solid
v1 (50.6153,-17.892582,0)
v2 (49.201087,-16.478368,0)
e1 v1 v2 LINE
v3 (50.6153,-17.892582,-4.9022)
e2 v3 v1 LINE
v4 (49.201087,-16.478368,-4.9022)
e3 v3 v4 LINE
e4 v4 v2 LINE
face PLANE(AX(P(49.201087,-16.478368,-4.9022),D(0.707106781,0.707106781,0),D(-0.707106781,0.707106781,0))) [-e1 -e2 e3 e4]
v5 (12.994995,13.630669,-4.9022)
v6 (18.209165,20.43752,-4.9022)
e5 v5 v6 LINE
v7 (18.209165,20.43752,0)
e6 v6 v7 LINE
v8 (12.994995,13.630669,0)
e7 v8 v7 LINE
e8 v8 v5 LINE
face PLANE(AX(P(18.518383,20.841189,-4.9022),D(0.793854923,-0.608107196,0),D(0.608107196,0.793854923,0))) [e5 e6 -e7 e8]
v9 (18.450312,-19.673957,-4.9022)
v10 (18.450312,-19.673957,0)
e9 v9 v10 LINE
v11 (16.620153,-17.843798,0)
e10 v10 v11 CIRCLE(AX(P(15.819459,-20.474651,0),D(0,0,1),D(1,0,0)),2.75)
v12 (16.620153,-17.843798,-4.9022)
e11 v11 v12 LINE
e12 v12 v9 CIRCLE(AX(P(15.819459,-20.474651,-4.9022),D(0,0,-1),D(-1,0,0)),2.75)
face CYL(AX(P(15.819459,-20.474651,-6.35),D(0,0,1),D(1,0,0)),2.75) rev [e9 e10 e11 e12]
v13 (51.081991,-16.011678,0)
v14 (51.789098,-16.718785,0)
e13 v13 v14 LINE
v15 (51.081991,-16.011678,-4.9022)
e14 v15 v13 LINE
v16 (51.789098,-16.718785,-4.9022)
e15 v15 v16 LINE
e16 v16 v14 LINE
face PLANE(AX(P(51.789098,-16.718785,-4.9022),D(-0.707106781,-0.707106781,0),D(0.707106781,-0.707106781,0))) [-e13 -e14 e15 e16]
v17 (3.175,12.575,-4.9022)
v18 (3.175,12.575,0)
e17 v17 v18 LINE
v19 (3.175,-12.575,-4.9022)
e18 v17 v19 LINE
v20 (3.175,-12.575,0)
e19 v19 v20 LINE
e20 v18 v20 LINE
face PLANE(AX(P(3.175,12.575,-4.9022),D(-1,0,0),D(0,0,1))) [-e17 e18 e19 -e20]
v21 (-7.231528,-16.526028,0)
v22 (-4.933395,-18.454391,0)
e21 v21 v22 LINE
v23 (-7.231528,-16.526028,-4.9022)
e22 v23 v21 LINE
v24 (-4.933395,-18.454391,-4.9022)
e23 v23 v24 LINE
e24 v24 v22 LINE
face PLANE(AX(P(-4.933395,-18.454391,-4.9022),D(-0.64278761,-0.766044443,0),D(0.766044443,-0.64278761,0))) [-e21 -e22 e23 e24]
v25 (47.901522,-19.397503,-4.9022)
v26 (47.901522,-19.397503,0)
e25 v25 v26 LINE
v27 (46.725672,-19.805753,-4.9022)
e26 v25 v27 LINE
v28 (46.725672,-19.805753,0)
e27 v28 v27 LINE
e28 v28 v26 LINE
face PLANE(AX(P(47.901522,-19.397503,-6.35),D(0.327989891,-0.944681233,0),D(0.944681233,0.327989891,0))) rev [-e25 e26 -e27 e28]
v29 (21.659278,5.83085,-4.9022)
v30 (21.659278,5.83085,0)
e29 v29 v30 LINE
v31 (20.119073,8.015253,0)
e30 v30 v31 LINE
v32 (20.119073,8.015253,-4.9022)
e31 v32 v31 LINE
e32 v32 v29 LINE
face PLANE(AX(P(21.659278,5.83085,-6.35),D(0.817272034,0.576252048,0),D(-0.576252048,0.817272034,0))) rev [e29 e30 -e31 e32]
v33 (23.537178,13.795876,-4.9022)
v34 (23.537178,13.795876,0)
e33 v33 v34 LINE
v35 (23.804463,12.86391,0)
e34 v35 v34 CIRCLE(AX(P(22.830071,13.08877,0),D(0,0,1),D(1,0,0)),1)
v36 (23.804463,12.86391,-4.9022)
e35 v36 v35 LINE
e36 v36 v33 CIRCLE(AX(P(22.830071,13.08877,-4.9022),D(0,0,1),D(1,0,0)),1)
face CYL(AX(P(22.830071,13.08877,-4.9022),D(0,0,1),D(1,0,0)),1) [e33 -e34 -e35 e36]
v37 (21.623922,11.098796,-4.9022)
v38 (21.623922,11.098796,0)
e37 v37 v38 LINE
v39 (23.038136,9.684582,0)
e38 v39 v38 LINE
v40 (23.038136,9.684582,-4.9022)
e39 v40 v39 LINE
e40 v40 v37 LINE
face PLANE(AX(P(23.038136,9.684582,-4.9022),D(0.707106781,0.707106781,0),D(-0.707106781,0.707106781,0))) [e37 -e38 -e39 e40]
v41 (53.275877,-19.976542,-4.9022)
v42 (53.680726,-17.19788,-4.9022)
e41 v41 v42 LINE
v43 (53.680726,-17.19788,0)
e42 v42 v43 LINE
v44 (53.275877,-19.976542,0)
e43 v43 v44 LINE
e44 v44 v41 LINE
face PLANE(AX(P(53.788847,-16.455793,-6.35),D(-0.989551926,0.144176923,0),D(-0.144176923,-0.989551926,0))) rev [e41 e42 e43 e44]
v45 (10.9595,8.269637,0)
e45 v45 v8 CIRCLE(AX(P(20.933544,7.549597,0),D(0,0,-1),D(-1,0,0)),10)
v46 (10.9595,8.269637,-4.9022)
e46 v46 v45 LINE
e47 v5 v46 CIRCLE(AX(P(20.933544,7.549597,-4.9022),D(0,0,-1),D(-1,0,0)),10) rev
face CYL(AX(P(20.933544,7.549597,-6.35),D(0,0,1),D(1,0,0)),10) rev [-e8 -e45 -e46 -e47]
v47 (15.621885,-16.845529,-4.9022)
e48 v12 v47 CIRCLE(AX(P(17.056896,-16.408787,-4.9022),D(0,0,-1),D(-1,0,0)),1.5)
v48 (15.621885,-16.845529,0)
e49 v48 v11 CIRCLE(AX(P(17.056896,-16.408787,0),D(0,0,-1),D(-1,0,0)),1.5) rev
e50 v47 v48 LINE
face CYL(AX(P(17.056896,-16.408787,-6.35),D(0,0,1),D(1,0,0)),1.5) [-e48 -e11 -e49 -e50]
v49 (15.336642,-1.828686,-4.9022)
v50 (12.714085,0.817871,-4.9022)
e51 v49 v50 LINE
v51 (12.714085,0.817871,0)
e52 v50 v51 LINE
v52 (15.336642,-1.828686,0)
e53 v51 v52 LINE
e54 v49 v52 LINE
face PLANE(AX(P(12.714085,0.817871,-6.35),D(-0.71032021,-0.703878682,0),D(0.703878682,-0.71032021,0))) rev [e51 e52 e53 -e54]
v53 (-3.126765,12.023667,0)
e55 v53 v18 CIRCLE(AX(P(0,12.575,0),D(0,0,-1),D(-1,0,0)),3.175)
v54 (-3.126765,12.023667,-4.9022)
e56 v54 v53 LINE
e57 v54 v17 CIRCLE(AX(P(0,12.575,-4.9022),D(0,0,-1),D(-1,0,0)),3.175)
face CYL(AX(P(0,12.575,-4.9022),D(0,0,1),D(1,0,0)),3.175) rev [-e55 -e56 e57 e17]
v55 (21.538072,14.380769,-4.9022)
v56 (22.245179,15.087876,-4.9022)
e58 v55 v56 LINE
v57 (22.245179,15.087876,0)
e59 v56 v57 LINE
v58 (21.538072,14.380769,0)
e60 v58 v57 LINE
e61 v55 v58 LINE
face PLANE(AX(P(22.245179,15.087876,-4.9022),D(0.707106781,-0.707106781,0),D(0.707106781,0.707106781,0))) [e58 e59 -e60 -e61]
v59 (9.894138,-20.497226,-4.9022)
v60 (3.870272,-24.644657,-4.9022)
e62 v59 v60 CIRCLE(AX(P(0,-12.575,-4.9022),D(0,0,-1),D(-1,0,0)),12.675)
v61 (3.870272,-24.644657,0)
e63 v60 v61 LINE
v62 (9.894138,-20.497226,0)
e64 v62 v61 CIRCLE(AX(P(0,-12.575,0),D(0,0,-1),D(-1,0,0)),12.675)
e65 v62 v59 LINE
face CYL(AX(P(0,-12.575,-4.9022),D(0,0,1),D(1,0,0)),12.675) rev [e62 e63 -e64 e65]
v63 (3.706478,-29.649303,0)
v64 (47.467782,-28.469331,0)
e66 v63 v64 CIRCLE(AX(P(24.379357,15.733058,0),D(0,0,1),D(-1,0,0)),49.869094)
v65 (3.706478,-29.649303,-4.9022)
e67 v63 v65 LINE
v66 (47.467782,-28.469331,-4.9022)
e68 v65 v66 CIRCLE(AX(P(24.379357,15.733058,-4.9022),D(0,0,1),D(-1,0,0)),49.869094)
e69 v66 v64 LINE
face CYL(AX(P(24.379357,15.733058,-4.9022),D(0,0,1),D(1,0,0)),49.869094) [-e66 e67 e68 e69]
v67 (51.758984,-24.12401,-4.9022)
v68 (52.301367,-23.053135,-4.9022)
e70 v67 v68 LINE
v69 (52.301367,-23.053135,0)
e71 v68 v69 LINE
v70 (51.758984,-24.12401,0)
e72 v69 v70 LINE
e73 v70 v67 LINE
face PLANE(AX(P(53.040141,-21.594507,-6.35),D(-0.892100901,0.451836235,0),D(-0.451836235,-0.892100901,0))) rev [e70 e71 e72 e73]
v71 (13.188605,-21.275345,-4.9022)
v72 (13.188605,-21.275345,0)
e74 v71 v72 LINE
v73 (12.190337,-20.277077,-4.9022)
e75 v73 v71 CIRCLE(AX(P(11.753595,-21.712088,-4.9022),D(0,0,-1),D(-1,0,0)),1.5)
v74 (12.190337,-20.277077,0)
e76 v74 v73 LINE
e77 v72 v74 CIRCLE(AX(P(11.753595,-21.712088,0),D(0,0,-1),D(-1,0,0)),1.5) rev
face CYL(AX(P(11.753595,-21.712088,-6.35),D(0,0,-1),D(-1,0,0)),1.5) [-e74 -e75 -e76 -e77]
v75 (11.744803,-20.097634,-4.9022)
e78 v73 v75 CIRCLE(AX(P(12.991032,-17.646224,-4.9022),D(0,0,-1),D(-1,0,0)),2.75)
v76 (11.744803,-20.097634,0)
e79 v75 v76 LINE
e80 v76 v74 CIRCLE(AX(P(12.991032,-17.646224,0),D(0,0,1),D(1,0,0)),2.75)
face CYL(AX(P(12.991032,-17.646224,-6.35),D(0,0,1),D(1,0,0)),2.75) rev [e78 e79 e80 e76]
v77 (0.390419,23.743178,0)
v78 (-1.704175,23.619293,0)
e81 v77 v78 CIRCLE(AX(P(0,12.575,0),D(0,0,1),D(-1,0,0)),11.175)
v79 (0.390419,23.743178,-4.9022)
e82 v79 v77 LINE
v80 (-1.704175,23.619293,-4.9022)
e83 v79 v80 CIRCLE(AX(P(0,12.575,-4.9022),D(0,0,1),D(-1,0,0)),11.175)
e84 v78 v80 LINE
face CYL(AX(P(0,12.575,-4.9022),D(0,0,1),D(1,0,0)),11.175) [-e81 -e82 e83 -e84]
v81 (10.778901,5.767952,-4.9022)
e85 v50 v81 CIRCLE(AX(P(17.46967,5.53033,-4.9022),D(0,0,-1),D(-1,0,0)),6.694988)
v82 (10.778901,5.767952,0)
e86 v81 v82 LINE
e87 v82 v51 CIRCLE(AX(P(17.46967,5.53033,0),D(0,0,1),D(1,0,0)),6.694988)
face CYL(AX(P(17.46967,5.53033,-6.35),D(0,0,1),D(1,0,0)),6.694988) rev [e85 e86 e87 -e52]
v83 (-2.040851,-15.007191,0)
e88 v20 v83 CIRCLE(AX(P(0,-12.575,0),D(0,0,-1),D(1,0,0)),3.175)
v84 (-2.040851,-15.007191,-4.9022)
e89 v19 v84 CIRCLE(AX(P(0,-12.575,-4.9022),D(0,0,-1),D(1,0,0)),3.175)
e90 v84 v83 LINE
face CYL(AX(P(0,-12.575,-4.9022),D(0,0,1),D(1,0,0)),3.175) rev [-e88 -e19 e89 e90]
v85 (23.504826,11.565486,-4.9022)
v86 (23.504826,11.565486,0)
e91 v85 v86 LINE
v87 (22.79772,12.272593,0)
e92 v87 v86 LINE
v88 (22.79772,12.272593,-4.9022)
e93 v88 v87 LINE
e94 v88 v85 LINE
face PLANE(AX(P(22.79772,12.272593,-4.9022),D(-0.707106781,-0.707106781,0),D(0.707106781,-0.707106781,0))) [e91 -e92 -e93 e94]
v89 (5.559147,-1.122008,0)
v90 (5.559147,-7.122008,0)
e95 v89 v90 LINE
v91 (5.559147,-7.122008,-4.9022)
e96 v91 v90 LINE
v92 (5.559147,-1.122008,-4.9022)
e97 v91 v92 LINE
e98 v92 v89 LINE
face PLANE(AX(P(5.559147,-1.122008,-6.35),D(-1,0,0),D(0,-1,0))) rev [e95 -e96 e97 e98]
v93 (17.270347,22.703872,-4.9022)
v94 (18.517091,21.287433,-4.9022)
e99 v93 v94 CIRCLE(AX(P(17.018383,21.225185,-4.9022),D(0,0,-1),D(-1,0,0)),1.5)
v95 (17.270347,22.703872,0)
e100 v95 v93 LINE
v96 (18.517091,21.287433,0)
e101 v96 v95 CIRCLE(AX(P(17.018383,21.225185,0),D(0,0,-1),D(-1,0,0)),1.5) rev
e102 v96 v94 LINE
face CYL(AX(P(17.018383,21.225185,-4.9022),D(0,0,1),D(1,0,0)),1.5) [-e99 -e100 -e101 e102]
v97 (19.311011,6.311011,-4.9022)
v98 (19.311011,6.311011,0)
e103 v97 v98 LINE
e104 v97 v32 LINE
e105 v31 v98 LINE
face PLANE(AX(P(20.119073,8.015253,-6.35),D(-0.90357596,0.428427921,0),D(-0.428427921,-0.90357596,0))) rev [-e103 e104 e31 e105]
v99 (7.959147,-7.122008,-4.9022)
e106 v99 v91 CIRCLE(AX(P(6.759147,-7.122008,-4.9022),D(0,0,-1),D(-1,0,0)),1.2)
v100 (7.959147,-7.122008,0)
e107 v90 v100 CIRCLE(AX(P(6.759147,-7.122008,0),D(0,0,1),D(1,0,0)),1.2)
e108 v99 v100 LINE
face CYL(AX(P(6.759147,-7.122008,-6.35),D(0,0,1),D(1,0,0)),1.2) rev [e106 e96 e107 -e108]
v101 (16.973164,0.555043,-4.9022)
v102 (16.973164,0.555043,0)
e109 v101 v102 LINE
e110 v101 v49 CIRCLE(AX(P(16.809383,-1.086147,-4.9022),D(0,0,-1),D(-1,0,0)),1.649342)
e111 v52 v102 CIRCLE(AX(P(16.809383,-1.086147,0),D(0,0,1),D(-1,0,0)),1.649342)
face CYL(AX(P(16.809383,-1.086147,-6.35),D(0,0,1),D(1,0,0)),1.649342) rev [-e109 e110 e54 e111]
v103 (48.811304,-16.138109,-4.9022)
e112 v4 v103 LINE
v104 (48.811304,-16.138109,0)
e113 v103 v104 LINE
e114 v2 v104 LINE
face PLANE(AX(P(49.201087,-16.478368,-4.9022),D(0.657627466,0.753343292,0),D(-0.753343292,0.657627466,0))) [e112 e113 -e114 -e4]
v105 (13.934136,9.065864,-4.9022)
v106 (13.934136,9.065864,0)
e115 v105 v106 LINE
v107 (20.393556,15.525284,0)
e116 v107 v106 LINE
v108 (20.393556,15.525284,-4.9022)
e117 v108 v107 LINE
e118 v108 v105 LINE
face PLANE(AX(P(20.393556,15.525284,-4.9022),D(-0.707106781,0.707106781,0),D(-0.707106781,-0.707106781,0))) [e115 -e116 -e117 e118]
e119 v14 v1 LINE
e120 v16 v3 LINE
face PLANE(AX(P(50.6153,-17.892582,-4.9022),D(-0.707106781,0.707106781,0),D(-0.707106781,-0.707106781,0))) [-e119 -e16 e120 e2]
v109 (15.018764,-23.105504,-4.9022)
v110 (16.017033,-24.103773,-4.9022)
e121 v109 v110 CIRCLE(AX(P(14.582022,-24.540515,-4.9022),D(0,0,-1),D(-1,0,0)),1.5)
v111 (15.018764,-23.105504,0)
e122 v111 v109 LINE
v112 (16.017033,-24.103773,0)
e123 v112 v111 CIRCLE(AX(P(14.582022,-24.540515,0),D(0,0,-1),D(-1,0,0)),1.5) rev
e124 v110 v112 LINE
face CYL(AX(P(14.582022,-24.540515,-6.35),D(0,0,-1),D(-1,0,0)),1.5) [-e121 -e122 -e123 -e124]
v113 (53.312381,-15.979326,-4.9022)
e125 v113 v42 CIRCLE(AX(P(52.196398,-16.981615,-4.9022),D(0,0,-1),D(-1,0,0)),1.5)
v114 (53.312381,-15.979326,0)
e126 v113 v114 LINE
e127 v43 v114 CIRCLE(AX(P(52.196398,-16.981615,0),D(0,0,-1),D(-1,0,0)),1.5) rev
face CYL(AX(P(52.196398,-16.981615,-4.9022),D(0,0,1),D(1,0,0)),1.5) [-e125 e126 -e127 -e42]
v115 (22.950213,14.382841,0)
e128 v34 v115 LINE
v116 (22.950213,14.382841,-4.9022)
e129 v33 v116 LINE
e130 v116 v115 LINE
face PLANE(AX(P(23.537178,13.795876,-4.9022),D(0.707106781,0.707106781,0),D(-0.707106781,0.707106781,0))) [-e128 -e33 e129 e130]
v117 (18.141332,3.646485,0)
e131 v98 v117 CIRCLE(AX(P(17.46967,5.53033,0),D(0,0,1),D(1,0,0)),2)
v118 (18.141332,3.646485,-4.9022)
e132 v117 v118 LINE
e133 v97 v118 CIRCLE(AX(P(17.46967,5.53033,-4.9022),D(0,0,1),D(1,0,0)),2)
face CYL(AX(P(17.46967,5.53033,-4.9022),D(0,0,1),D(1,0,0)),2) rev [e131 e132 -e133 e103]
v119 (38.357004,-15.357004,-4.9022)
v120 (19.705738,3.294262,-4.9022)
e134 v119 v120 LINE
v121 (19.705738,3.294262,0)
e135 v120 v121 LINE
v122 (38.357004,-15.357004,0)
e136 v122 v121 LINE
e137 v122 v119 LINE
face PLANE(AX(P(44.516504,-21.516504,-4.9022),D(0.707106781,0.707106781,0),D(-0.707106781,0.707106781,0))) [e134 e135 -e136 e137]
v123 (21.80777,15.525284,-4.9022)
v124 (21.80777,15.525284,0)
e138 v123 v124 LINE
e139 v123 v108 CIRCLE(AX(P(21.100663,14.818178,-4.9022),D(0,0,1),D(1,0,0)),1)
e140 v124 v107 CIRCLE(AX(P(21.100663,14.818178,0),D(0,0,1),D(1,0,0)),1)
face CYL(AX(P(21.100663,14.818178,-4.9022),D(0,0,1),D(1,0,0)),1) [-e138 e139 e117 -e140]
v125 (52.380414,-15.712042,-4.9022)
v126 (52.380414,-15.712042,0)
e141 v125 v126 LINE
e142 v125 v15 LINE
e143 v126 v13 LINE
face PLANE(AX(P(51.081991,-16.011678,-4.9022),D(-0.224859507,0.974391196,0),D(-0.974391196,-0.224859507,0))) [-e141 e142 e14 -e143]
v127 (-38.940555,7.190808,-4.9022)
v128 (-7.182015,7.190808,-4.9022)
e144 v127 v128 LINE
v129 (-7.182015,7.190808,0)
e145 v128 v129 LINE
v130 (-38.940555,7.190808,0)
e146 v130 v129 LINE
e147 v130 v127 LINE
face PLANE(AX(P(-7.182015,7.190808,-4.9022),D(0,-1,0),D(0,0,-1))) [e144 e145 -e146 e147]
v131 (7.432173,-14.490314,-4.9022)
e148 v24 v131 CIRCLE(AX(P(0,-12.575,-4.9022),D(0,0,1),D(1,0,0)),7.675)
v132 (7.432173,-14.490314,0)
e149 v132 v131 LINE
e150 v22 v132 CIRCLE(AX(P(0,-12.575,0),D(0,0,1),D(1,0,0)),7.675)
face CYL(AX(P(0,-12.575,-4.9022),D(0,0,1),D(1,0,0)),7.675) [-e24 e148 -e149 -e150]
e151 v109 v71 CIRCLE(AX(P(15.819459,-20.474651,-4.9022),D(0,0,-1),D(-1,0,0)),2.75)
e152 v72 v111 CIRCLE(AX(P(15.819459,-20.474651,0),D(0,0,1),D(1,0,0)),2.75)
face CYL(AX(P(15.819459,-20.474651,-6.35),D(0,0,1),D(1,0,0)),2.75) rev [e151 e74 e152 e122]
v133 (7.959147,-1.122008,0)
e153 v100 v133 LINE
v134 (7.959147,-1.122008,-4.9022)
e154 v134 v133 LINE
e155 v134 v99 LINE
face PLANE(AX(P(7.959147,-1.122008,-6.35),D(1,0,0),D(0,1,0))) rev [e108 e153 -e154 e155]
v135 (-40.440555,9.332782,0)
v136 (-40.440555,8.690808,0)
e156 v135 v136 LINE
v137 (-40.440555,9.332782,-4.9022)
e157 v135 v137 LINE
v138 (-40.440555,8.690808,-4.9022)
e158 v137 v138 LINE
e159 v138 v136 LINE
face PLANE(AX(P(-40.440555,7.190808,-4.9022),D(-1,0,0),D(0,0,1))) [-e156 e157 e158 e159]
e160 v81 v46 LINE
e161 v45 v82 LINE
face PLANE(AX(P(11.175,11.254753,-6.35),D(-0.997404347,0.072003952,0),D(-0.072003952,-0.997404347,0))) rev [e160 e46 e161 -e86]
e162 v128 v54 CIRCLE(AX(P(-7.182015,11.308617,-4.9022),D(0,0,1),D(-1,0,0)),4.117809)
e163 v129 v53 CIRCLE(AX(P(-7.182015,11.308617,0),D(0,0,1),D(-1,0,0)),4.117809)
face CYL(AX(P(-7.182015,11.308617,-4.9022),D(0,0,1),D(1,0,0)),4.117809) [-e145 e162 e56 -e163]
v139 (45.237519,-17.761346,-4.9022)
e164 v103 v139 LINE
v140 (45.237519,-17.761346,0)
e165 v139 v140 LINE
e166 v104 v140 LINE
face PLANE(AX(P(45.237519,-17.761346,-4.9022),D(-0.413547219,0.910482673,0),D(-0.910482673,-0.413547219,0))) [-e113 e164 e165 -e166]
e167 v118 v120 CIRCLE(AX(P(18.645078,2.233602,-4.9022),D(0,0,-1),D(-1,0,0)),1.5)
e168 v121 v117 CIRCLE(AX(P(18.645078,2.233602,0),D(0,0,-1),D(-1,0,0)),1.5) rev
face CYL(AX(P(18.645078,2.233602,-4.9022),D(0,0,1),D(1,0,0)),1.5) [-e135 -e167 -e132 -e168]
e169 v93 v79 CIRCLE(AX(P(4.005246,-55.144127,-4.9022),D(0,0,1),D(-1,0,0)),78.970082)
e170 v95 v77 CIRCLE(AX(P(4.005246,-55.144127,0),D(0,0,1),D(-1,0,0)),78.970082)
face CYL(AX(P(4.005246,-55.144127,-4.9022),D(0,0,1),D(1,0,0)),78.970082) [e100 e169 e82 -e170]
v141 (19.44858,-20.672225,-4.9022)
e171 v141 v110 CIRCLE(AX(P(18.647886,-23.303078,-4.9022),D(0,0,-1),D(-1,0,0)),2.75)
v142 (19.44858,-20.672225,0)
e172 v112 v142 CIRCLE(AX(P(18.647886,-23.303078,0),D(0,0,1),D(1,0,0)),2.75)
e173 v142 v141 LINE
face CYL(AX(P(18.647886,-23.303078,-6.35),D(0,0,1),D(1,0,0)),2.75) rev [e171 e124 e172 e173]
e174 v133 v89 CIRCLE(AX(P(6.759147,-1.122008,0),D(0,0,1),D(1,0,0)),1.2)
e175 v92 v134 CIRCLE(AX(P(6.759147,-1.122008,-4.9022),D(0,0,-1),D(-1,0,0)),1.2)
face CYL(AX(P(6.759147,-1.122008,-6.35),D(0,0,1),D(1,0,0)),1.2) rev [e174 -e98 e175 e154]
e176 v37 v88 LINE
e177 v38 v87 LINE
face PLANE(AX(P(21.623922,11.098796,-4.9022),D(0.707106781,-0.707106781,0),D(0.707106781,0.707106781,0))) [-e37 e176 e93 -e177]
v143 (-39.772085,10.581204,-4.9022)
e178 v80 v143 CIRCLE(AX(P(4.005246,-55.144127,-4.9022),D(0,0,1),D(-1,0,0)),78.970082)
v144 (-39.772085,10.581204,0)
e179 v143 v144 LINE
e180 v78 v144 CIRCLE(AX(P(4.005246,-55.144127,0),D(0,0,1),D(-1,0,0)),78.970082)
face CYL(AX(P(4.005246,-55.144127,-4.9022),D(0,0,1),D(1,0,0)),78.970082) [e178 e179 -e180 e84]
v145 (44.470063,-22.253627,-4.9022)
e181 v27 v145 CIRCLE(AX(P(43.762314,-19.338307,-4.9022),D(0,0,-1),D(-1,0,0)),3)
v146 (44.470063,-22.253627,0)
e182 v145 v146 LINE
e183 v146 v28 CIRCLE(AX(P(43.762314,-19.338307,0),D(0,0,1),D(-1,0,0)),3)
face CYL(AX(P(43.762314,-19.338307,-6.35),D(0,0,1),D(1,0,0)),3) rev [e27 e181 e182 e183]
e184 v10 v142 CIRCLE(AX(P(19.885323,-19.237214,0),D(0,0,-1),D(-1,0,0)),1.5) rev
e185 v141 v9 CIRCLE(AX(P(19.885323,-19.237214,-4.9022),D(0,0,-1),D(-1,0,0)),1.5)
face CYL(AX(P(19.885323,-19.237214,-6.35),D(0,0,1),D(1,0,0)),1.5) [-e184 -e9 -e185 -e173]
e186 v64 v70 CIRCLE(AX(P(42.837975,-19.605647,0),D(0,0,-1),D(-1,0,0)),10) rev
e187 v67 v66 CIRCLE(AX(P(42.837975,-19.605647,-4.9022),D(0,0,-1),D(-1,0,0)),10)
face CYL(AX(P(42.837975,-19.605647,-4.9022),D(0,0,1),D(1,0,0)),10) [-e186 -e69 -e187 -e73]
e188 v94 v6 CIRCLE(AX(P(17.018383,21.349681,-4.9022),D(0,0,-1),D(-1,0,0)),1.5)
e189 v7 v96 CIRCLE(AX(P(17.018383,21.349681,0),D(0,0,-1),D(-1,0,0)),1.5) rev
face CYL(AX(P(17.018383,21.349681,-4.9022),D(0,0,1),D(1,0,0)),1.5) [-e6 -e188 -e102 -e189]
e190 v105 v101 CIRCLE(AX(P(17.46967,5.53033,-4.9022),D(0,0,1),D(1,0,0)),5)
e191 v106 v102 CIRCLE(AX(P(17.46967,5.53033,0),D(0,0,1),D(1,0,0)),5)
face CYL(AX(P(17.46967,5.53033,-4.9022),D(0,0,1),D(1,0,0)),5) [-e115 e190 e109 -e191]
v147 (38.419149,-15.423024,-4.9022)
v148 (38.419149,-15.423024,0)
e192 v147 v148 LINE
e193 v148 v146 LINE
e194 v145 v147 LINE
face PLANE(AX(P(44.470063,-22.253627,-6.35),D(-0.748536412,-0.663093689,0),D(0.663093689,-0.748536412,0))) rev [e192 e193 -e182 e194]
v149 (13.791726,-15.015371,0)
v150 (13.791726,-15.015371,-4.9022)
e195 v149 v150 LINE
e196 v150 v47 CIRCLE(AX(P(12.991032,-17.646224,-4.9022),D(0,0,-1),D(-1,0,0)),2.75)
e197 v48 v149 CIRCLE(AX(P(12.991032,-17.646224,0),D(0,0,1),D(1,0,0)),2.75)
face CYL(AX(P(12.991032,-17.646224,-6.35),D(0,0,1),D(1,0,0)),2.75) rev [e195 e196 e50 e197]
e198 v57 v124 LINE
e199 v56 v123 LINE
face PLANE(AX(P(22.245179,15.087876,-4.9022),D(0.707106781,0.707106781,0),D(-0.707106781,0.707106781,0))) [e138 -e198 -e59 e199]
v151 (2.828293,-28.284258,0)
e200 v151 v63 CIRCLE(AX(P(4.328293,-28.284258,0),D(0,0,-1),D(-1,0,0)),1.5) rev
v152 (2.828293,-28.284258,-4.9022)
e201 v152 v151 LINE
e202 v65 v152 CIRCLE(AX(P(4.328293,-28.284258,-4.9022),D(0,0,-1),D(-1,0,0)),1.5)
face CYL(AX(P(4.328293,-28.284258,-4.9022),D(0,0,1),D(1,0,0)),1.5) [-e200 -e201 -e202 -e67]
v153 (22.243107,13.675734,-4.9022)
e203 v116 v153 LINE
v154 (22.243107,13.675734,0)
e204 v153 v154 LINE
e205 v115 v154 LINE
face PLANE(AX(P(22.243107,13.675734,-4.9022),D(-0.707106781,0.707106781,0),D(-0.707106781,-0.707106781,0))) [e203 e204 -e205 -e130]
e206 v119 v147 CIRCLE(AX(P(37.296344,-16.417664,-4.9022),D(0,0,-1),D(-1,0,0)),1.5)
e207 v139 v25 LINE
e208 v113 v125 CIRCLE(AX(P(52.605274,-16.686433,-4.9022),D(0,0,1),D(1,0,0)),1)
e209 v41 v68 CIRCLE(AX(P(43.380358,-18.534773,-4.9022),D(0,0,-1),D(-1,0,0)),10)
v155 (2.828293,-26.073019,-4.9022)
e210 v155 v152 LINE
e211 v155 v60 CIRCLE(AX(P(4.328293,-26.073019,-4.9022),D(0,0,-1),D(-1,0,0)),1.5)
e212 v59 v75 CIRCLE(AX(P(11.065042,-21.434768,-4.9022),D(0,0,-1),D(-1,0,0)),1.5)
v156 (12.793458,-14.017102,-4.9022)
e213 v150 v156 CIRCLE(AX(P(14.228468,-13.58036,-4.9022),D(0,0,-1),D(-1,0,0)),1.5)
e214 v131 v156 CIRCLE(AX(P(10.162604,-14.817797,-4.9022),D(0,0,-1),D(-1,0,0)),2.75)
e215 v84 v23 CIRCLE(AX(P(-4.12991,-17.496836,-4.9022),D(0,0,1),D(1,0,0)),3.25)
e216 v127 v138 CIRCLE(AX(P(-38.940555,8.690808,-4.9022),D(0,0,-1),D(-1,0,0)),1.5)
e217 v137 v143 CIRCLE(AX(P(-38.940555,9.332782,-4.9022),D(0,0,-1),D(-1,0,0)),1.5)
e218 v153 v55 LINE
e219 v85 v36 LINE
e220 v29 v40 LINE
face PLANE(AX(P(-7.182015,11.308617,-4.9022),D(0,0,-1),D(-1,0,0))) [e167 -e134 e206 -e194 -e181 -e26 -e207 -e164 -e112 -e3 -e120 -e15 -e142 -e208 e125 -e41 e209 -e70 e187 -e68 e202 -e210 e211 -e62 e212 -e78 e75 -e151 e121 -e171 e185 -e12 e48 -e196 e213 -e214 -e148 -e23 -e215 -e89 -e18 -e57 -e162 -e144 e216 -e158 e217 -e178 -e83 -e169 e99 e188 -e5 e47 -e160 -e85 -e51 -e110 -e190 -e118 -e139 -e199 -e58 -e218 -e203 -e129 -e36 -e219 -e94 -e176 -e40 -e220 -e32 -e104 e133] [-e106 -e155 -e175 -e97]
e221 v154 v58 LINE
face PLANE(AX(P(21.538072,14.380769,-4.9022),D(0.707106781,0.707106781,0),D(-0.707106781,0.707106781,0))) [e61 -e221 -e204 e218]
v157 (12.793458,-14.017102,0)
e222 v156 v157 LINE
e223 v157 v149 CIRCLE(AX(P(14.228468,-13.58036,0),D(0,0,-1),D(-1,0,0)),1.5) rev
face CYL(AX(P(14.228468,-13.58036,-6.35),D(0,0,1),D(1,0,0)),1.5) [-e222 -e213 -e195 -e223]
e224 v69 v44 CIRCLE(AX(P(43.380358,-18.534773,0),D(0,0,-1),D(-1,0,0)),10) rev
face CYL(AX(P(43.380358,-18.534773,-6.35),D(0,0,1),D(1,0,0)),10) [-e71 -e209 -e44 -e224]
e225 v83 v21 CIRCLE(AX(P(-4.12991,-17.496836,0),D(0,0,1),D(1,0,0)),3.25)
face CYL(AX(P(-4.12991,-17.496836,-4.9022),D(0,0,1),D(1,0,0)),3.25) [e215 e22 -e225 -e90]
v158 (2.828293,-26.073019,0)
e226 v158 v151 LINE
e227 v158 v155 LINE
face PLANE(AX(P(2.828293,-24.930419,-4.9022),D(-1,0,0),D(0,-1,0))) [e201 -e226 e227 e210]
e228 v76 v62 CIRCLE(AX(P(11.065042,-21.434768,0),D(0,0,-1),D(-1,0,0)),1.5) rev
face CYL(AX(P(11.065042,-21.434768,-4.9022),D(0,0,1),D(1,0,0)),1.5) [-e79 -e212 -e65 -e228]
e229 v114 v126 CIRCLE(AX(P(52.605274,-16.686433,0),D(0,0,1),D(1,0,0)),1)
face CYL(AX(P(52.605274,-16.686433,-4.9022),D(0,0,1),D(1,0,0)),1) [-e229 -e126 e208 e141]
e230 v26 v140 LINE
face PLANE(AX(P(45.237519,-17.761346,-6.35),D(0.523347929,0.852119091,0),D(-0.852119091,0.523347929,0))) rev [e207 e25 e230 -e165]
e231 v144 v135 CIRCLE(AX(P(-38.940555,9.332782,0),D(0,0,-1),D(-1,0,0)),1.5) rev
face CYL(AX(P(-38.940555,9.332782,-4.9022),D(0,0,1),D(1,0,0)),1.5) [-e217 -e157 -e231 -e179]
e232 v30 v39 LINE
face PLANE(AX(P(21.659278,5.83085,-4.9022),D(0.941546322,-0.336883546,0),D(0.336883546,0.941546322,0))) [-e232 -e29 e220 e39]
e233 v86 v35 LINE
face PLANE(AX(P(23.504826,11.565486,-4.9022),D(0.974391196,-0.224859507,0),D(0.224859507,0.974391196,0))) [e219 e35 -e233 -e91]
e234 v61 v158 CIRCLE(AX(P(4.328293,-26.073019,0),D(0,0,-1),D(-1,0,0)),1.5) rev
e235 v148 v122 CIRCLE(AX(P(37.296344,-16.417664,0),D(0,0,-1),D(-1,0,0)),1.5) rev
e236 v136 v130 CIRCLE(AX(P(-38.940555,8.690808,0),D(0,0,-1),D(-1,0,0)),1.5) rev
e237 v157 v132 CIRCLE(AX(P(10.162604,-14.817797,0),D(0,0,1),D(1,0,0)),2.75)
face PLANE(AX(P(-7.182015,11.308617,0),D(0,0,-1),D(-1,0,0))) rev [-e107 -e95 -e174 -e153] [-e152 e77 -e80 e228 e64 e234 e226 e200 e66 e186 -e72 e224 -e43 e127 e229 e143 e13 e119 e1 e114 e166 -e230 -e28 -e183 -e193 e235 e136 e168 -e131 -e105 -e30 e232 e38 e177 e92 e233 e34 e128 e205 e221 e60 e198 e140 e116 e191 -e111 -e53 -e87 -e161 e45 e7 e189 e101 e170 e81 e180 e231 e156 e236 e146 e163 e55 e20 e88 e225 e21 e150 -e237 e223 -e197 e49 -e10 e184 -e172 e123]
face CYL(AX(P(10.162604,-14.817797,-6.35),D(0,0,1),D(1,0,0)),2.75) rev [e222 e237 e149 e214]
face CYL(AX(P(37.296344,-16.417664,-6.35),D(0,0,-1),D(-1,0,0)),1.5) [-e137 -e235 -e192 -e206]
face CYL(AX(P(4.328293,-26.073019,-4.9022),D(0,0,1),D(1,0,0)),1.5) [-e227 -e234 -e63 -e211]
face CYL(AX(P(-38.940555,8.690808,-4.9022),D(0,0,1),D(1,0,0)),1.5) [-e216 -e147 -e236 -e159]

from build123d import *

# Parameters (mm, degrees)
CART_CLIP_DEPTH                    = 4.9022
DEVICE_CLIP_DEPTH                  = 4.9022
JOINT_DEPTH                        = 4.9022
JOINT_FILLETS_R                    = 1
DEVICE_CLIP_FLEX_RELIEF_GEOMETRY_R = 2
DEVICE_CLIP_FLEX_RELIEF_DEPTH      = 62.785838519
SNAP_IN_RELIEF_DEPTH               = 6.35
BOTTOM_BEEFUP_DEPTH                = 4.9022
CABLE_HOLE_R                       = 2.75
CABLE_HOLE_CUT_DEPTH               = 6.35
SHELF_TAIL_DEPTH                   = 4.9022
FRONT_TAB_BEEF_DEPTH               = 4.9022
TOP_CURVE_EXTRUSION_DEPTH          = 4.9022
LPATTERN1_COUNT                    = 4
LPATTERN1_PITCH                    = 4
POSCON_BOTTOM_SNAPBEEF_DEPTH       = 4.9022
POSCON_TOP_CLIP_FLEX_RELIEF_DEPTH  = 6.35
ZIP_TIE_SLOT_DEPTH                 = 6.35
POSCON_BOTTOM_SNAP_RELIEF_DEPTH    = 6.35
SMALL_START                        = -6
SMALL_FILLET_DEPTH                 = 7
POSCON_TOP_SNAP_RELIEF_DEPTH       = 6.35
LARGE_FILLET_R                     = 10


with BuildPart() as part:
    # Cart Clip Geometry → Cart Clip (new body)
    with BuildSketch(Plane.XY):
        with BuildLine():
            Line((11.175, 4.575), (7.675, -8.575))
            Line((7.675, -8.575), (7.675, -12.575))
            ThreePointArc((7.675, -12.575), (3.243595159, -19.530912266), (-4.933394904, -18.454391101))
            Line((-4.933394904, -18.454391101), (-7.231528234, -16.526028272))
            ThreePointArc((-7.231528234, -16.526028272), (-5.042617938, -14.377626523), (-2.040850661, -15.007191107))
            ThreePointArc((-2.040850661, -15.007191107), (1.341812981, -15.452527224), (3.175, -12.575))
            Line((3.175, -12.575), (3.175, 12.575))
            ThreePointArc((3.175, 12.575), (-0.276719483, 15.737918166), (-3.126764616, 12.023667036))
            ThreePointArc((-3.126764616, 12.023667036), (-5.791346514, 7.43274359), (-10.766819067, 9.282405083))
            Line((-10.766819067, 9.282405083), (-11.00522664, 10.634481615))
            ThreePointArc((-11.00522664, 10.634481615), (-0.973965425, 23.707475751), (11.175, 12.575))
            Line((11.175, 12.575), (11.175, 4.575))
        make_face()
    extrude(amount=-CART_CLIP_DEPTH)



with BuildPart() as body_2:
    # Device Clip Geometry → Device Clip (new body)
    with BuildSketch(Plane.XY):
        with BuildLine():
            Line((22.245178849, 15.087875605), (21.538072068, 14.380768824))
            Line((21.538072068, 14.380768824), (22.243106562, 13.67573433))
            Line((22.243106562, 13.67573433), (22.950213344, 14.382841111))
            Line((22.950213344, 14.382841111), (23.537178094, 13.79587636))
            ThreePointArc((23.537178094, 13.79587636), (23.791320059, 13.364452092), (23.804462509, 12.863910072))
            Line((23.804462509, 12.863910072), (23.504826292, 11.565486463))
            Line((23.504826292, 11.565486463), (22.79771951, 12.272593245))
            Line((22.79771951, 12.272593245), (21.623922254, 11.098795988))
            Line((21.623922254, 11.098795988), (23.038135816, 9.684582425))
            Line((23.038135816, 9.684582425), (21.659277593, 5.830850468))
            Line((21.659277593, 5.830850468), (20.24506403, 7.24506403))
            Line((20.24506403, 7.24506403), (18, 5))
            Line((18, 5), (44.516504294, -21.516504294))
            Line((44.516504294, -21.516504294), (46.761568325, -19.271440264))
            Line((46.761568325, -19.271440264), (45.347354762, -17.857226702))
            Line((45.347354762, -17.857226702), (49.20108672, -16.478368479))
            Line((49.20108672, -16.478368479), (50.615300282, -17.892582041))
            Line((50.615300282, -17.892582041), (51.789097539, -16.718784784))
            Line((51.789097539, -16.718784784), (51.081990758, -16.011678003))
            Line((51.081990758, -16.011678003), (52.380414367, -15.712041786))
            ThreePointArc((52.380414367, -15.712041786), (52.880956387, -15.725184235), (53.312380655, -15.9793262))
            Line((53.312380655, -15.9793262), (53.899345406, -16.566290951))
            Line((53.899345406, -16.566290951), (53.192238624, -17.273397732))
            Line((53.192238624, -17.273397732), (53.897273119, -17.978432226))
            Line((53.897273119, -17.978432226), (54.6043799, -17.271325445))
            Line((54.6043799, -17.271325445), (55.041788732, -17.708734278))
            ThreePointArc((55.041788732, -17.708734278), (55.334681951, -18.415841059), (55.041788732, -19.12294784))
            Line((55.041788732, -19.12294784), (48.582368286, -25.582368286))
            ThreePointArc((48.582368286, -25.582368286), (45.04683438, -27.04683438), (41.511300474, -25.582368286))
            Line((41.511300474, -25.582368286), (13.934136008, 1.99479618))
            ThreePointArc((13.934136008, 1.99479618), (12.469669914, 5.530330086), (13.934136008, 9.065863992))
            Line((13.934136008, 9.065863992), (20.393556454, 15.525284438))
            ThreePointArc((20.393556454, 15.525284438), (21.100663236, 15.818177657), (21.807770017, 15.525284438))
            Line((21.807770017, 15.525284438), (22.245178849, 15.087875605))
        make_face()
    extrude(amount=-DEVICE_CLIP_DEPTH)


with BuildPart() as part_1:
    add(part.part)

    add(body_2.part)  # Joint merges body 2
    # Joint Geometry → Joint (add)
    with BuildSketch(Plane.XY):
        Polygon((7.675, -8.575), (41.511300474, -25.582368286), (13.934136008, 1.99479618), (11.175, 4.575), align=None)
    extrude(amount=-JOINT_DEPTH)

    # joint fillets
    # the kernel refuses this fillet: 1 mm, written as the material it adds along each edge
    with BuildSketch(Plane(origin=(7.675, -8.575, 0), x_dir=(0.8934828469815188, -0.44909731924138613, 0), z_dir=(0, 0, -1))) as joint_fillets_piece_1:
        with BuildLine():
            CenterArc((JOINT_FILLETS_R * 1.62185242183, JOINT_FILLETS_R), JOINT_FILLETS_R, 153.314216372, 116.685783628)
            Line((JOINT_FILLETS_R * 0.728369574849, JOINT_FILLETS_R * 1.44909731924), (0, 0))
            Line((0, 0), (JOINT_FILLETS_R * 1.62185242183, 0))
        make_face()
    extrude(amount=4.9022)
    with BuildSketch(Plane(origin=(41.511300474, -25.582368286, 0), x_dir=(-0.8934828469815294, 0.44909731924136537, 0), z_dir=(0, 0, -1))) as joint_fillets_piece_2:
        with BuildLine():
            CenterArc((0.153680417, -1), JOINT_FILLETS_R, 90, 16.706554242)
            ThreePointArc((-0.133789669, -0.042210383), (-0.066746785, -0.02157445), (0, 0))
            Line((0, 0), (0.153680417, 0))
        make_face()
    extrude(amount=4.9022)
    with BuildSketch(Plane(origin=(13.934136008, 1.99479618, 0), x_dir=(-0.7303933527208762, 0.6830267566509803, 0), z_dir=(0, 0, -1))) as joint_fillets_piece_3:
        with BuildLine():
            CenterArc((4.307177284, 1), JOINT_FILLETS_R, 138.225615508, 131.774384492)
            ThreePointArc((3.561403369, 1.66619912), (1.95135729, 0.468333164), (0, 0))
            Line((0, 0), (4.307177284, 0))
        make_face()
    extrude(amount=4.9022)
    with BuildSketch(Plane(origin=(11.175, 4.575, 0), x_dir=(0, 1, 0), z_dir=(0, 0, -1))) as joint_fillets_piece_4:
        with BuildLine():
            CenterArc((JOINT_FILLETS_R * 0.43397607901, JOINT_FILLETS_R), JOINT_FILLETS_R, 223.080619659, 46.919380341)
            Line((-JOINT_FILLETS_R * 0.296417273711, JOINT_FILLETS_R * 0.316973243349), (0, 0))
            Line((0, 0), (JOINT_FILLETS_R * 0.43397607901, 0))
        make_face()
    extrude(amount=4.9022)

    # Device Clip Flex Relief Geometry → Device Clip Flex Relief (cut, through all)
    with BuildSketch(Plane.XY):
        with Locations((17.469669914, 5.530330086)):
            Circle(DEVICE_CLIP_FLEX_RELIEF_GEOMETRY_R)
    extrude(amount=-DEVICE_CLIP_FLEX_RELIEF_DEPTH, mode=Mode.SUBTRACT)

    # Sketch5 → SNAP IN RELIEF (cut)
    with BuildSketch(Plane.XY):
        with BuildLine():
            Line((44.470063399, -22.25362726), (38.389074456, -15.389074456))
            Line((38.389074456, -15.389074456), (46.761568325, -19.271440264))
            ThreePointArc((46.761568325, -19.271440264), (46.141143244, -21.16619399), (44.470063399, -22.25362726))
        make_face()
    extrude(amount=-SNAP_IN_RELIEF_DEPTH, mode=Mode.SUBTRACT)

    # BOTTOM BEEFUP SKETCH → BOTTOM BEEFUP (add)
    with BuildSketch(Plane.XY):
        with BuildLine():
            Line((10.677043667, -13.889484035), (7.526361766, -14.078164518))
            Line((7.526361766, -14.078164518), (7.208614318, -8.772257329))
            Line((7.208614318, -8.772257329), (10.675, -9.282514389))
            Line((10.675, -9.282514389), (44.278748713, -25.488746112))
            Line((44.278748713, -25.488746112), (53.899345406, -16.566290951))
            Line((53.899345406, -16.566290951), (55.041788732, -17.708734278))
            ThreePointArc((55.041788732, -17.708734278), (55.966427661, -19.737585883), (55.333281386, -21.875416975))
            Line((55.333281386, -21.875416975), (50.398436239, -26.810262122))
            ThreePointArc((50.398436239, -26.810262122), (26.922067406, -34.071170743), (2.828292768, -29.238913377))
            Line((2.828292768, -29.238913377), (2.828292768, -24.930419257))
            ThreePointArc((2.828292768, -24.930419257), (8.371790669, -22.091761318), (11.894021473, -16.955397036))
            Line((11.894021473, -16.955397036), (10.677043667, -13.889484035))
        make_face()
    extrude(amount=-BOTTOM_BEEFUP_DEPTH)

    # CABLE HOLE → CABLE HOLE CUT (cut)
    with BuildSketch(Plane.XY):
        with Locations((10.162604388, -14.817796793)):
            Circle(CABLE_HOLE_R)
    cable_hole_cut = extrude(amount=-CABLE_HOLE_CUT_DEPTH, mode=Mode.SUBTRACT)

    # BOX SLIDE BEEF → SHELF TAIL (add)
    with BuildSketch(Plane.XY):
        Polygon((-7.182015159, 7.190807632), (-40.440555285, 7.190807632), (-40.440555285, 10.131018627), (-4.155347731, 22.948702822), align=None)
    extrude(amount=-SHELF_TAIL_DEPTH)

    # BEHIND TOP CLIP BEEF SKETCH → FRONT TAB BEEF (add)
    with BuildSketch(Plane.XY):
        Polygon((18.518382836, 20.841188896), (11.175, 11.254753066), (0.590090247, 23.734409415), (18.518382836, 22.48088631), align=None)
    extrude(amount=-FRONT_TAB_BEEF_DEPTH)

    # TOP CURVE → TOP CURVE EXTRUSION (add)
    with BuildSketch(Plane.XY):
        with BuildLine():
            Line((-40.440555285, 10.131018627), (-38.751141722, 8.751938886))
            Line((-38.751141722, 8.751938886), (0, 16.86846238))
            Line((0, 16.86846238), (13.175622622, 16.86846238))
            Line((13.175622622, 16.86846238), (18.518382836, 22.48088631))
            ThreePointArc((18.518382836, 22.48088631), (-12.184902527, 22.148517873), (-40.440555285, 10.131018627))
        make_face()
    extrude(amount=-TOP_CURVE_EXTRUSION_DEPTH)

    # LPattern1: CABLE HOLE CUT ×4
    with Locations(*[Vector(0.7071067811865482, -0.7071067811865469, 0) * (i * LPATTERN1_PITCH) for i in range(1, LPATTERN1_COUNT)]):
        add(cable_hole_cut, mode=Mode.SUBTRACT)

    # Sketch13 → POSCON BOTTOM SNAPBEEF (add)
    with BuildSketch(Plane.XY):
        Polygon((49.20108672, -16.478368479), (48.811303545, -16.138109098), (45.23751859, -17.761345734), (45.347354762, -17.857226702), align=None)
    extrude(amount=-POSCON_BOTTOM_SNAPBEEF_DEPTH)

    # Sketch14 → POSCON TOP CLIP FLEX RELIEF (cut)
    with BuildSketch(Plane.XY):
        with BuildLine():
            Line((12.714084889, 0.817871011), (15.336641714, -1.828686076))
            ThreePointArc((15.336641714, -1.828686076), (18.169119991, -2.019659869), (16.973164436, 0.555042927))
            ThreePointArc((16.973164436, 0.555042927), (15.318693794, 1.016650685), (13.918068864, 2.010936675))
            ThreePointArc((13.918068864, 2.010936675), (12.824536262, 3.680267019), (12.470969242, 5.644310734))
            Line((12.470969242, 5.644310734), (11.175, 11.254753066))
            Line((11.175, 11.254753066), (10.778900507, 5.767952045))
            ThreePointArc((10.778900507, 5.767952045), (11.234240257, 3.092651589), (12.714084889, 0.817871011))
        make_face()
    extrude(amount=-POSCON_TOP_CLIP_FLEX_RELIEF_DEPTH, mode=Mode.SUBTRACT)

    # Sketch15 → ZIP TIE SLOT (cut)
    with BuildSketch(Plane.XY):
        with BuildLine():
            Line((7.959147306, -1.122008403), (7.959147306, -7.122008403))
            ThreePointArc((7.959147306, -7.122008403), (6.759147306, -8.322008403), (5.559147306, -7.122008403))
            Line((5.559147306, -7.122008403), (5.559147306, -1.122008403))
            ThreePointArc((5.559147306, -1.122008403), (6.759147306, 0.077991597), (7.959147306, -1.122008403))
        make_face()
    extrude(amount=-ZIP_TIE_SLOT_DEPTH, mode=Mode.SUBTRACT)

    # Sketch16 → POSCON BOTTOM SNAP RELIEF (cut)
    with BuildSketch(Plane.XY):
        Polygon((45.23751859, -17.761345734), (47.901521822, -19.397502687), (45.962169994, -20.070838595), align=None)
        Polygon((53.788847446, -16.455792992), (53.040140925, -21.594507061), (50.398436239, -26.810262122), (52.008012569, -28.207638953), (59.817475223, -20.235408925), align=None)
    extrude(amount=-POSCON_BOTTOM_SNAP_RELIEF_DEPTH, mode=Mode.SUBTRACT)

    # SMALL FILLET: read off the stored shape, not the designer's step
    # SMALL FILLET outline → SMALL FILLET (cut)
    with BuildSketch(Plane.XY.offset(SMALL_START)):
        with BuildLine():
            ThreePointArc((12.911452732, -14.897375574), (13.356384308, -14.920601542), (13.791725956, -15.015370746))
            ThreePointArc((13.791725956, -15.015370746), (13.167808208, -14.641020097), (12.793457559, -14.017102349))
            ThreePointArc((12.793457559, -14.017102349), (12.888226764, -14.452443998), (12.911452732, -14.897375574))
        make_face()
        with BuildLine():
            ThreePointArc((15.739879856, -17.725802698), (16.184811432, -17.749028666), (16.620153081, -17.843797871))
            ThreePointArc((16.620153081, -17.843797871), (15.996235332, -17.469447223), (15.621884684, -16.845529474))
            ThreePointArc((15.621884684, -16.845529474), (15.716653888, -17.280871122), (15.739879856, -17.725802698))
        make_face()
        with BuildLine():
            ThreePointArc((18.568306981, -20.554229823), (19.013238557, -20.577455791), (19.448580205, -20.672224996))
            ThreePointArc((19.448580205, -20.672224996), (18.824662457, -20.297874347), (18.450311808, -19.673956599))
            ThreePointArc((18.450311808, -19.673956599), (18.545081013, -20.109298247), (18.568306981, -20.554229823))
        make_face()
        with BuildLine():
            ThreePointArc((15.899037418, -23.223499386), (15.454105842, -23.200273418), (15.018764194, -23.105504213))
            ThreePointArc((15.018764194, -23.105504213), (15.642681942, -23.479854862), (16.017032591, -24.10377261))
            ThreePointArc((16.017032591, -24.10377261), (15.922263386, -23.668430962), (15.899037418, -23.223499386))
        make_face()
        with BuildLine():
            ThreePointArc((13.070610293, -20.395072261), (12.625678717, -20.371846293), (12.190337069, -20.277077088))
            ThreePointArc((12.190337069, -20.277077088), (12.814254818, -20.651427738), (13.188605466, -21.275345486))
            ThreePointArc((13.188605466, -21.275345486), (13.093836261, -20.840003837), (13.070610293, -20.395072261))
        make_face()
        with BuildLine():
            ThreePointArc((10.766719879, -19.263300835), (10.34883576, -19.893280086), (9.89413768, -20.497225986))
            ThreePointArc((9.89413768, -20.497225986), (10.748460388, -19.968555953), (11.744802711, -20.097634486))
            ThreePointArc((11.744802711, -20.097634486), (11.206321204, -19.738425894), (10.766719879, -19.263300835))
        make_face()
        with BuildLine():
            Line((2.828292768, -24.930419257), (2.828292768, -26.073018622))
            ThreePointArc((2.828292768, -26.073018622), (3.116469638, -25.189002389), (3.870272369, -24.644656863))
            ThreePointArc((3.870272369, -24.644656863), (3.352328856, -24.798645783), (2.828292768, -24.930419257))
        make_face()
        with BuildLine():
            ThreePointArc((3.706478432, -29.649302789), (3.066801289, -29.09582405), (2.828292768, -28.284258126))
            Line((2.828292768, -28.284258126), (2.828292768, -29.238913377))
            ThreePointArc((2.828292768, -29.238913377), (3.266388444, -29.446241882), (3.706478432, -29.649302789))
        make_face()
        with BuildLine():
            ThreePointArc((53.312380655, -15.9793262), (53.632233061, -16.547589912), (53.680725913, -17.197880348))
            Line((53.680725913, -17.197880348), (53.788847446, -16.455792992))
            Line((53.788847446, -16.455792992), (53.312380655, -15.9793262))
        make_face()
        with BuildLine():
            ThreePointArc((18.517090684, 21.287433062), (18.42867623, 20.838728265), (18.20916522, 20.437520055))
            Line((18.20916522, 20.437520055), (18.518382836, 20.841188896))
            Line((18.518382836, 20.841188896), (18.518382836, 22.48088631))
            ThreePointArc((18.518382836, 22.48088631), (17.894812545, 22.594883631), (17.270347278, 22.703871827))
            ThreePointArc((17.270347278, 22.703871827), (18.144343786, 22.216251337), (18.517090684, 21.287433062))
        make_face()
        with BuildLine():
            ThreePointArc((-38.940555285, 7.190807632), (-40.001215457, 7.63014746), (-40.440555285, 8.690807632))
            Line((-40.440555285, 8.690807632), (-40.440555285, 7.190807632))
            Line((-40.440555285, 7.190807632), (-38.940555285, 7.190807632))
        make_face()
        with BuildLine():
            ThreePointArc((-40.440555285, 9.332781992), (-40.262919659, 10.040844462), (-39.772085336, 10.581204106))
            ThreePointArc((-39.772085336, 10.581204106), (-40.106894609, 10.356964129), (-40.440555285, 10.131018627))
            Line((-40.440555285, 10.131018627), (-40.440555285, 9.332781992))
        make_face()
        with BuildLine():
            Line((38.389074456, -15.389074456), (38.357004142, -15.357004142))
            ThreePointArc((38.357004142, -15.357004142), (38.388575297, -15.389544316), (38.419148588, -15.423023781))
            Line((38.419148588, -15.423023781), (38.389074456, -15.389074456))
        make_face()
        with BuildLine():
            ThreePointArc((18.141331517, 3.646485429), (18.974552467, 3.696970103), (19.705737892, 3.294262108))
            Line((19.705737892, 3.294262108), (18.883883476, 4.116116524))
            ThreePointArc((18.883883476, 4.116116524), (18.538714881, 3.840021577), (18.141331517, 3.646485429))
        make_face()
    extrude(amount=SMALL_FILLET_DEPTH, mode=Mode.SUBTRACT)

    # Sketch12 → POSCON TOP SNAP RELIEF (cut)
    with BuildSketch(Plane.XY):
        Polygon((21.659277593, 5.830850468), (20.119072518, 8.015253176), (19.31101106, 6.31101106), align=None)
    extrude(amount=-POSCON_TOP_SNAP_RELIEF_DEPTH, mode=Mode.SUBTRACT)

    # LARGE FILLET
    large_fillet_edges = [part_1.edges().sort_by_distance(p)[0] for p in [
        (50.398436239, -26.810262122, -2.4511),
        (11.175, 11.254753066, -2.4511),
        (53.040140925, -21.594507061, -2.4511),
    ]]
    fillet(large_fillet_edges, radius=LARGE_FILLET_R)


solid = part_1.part
